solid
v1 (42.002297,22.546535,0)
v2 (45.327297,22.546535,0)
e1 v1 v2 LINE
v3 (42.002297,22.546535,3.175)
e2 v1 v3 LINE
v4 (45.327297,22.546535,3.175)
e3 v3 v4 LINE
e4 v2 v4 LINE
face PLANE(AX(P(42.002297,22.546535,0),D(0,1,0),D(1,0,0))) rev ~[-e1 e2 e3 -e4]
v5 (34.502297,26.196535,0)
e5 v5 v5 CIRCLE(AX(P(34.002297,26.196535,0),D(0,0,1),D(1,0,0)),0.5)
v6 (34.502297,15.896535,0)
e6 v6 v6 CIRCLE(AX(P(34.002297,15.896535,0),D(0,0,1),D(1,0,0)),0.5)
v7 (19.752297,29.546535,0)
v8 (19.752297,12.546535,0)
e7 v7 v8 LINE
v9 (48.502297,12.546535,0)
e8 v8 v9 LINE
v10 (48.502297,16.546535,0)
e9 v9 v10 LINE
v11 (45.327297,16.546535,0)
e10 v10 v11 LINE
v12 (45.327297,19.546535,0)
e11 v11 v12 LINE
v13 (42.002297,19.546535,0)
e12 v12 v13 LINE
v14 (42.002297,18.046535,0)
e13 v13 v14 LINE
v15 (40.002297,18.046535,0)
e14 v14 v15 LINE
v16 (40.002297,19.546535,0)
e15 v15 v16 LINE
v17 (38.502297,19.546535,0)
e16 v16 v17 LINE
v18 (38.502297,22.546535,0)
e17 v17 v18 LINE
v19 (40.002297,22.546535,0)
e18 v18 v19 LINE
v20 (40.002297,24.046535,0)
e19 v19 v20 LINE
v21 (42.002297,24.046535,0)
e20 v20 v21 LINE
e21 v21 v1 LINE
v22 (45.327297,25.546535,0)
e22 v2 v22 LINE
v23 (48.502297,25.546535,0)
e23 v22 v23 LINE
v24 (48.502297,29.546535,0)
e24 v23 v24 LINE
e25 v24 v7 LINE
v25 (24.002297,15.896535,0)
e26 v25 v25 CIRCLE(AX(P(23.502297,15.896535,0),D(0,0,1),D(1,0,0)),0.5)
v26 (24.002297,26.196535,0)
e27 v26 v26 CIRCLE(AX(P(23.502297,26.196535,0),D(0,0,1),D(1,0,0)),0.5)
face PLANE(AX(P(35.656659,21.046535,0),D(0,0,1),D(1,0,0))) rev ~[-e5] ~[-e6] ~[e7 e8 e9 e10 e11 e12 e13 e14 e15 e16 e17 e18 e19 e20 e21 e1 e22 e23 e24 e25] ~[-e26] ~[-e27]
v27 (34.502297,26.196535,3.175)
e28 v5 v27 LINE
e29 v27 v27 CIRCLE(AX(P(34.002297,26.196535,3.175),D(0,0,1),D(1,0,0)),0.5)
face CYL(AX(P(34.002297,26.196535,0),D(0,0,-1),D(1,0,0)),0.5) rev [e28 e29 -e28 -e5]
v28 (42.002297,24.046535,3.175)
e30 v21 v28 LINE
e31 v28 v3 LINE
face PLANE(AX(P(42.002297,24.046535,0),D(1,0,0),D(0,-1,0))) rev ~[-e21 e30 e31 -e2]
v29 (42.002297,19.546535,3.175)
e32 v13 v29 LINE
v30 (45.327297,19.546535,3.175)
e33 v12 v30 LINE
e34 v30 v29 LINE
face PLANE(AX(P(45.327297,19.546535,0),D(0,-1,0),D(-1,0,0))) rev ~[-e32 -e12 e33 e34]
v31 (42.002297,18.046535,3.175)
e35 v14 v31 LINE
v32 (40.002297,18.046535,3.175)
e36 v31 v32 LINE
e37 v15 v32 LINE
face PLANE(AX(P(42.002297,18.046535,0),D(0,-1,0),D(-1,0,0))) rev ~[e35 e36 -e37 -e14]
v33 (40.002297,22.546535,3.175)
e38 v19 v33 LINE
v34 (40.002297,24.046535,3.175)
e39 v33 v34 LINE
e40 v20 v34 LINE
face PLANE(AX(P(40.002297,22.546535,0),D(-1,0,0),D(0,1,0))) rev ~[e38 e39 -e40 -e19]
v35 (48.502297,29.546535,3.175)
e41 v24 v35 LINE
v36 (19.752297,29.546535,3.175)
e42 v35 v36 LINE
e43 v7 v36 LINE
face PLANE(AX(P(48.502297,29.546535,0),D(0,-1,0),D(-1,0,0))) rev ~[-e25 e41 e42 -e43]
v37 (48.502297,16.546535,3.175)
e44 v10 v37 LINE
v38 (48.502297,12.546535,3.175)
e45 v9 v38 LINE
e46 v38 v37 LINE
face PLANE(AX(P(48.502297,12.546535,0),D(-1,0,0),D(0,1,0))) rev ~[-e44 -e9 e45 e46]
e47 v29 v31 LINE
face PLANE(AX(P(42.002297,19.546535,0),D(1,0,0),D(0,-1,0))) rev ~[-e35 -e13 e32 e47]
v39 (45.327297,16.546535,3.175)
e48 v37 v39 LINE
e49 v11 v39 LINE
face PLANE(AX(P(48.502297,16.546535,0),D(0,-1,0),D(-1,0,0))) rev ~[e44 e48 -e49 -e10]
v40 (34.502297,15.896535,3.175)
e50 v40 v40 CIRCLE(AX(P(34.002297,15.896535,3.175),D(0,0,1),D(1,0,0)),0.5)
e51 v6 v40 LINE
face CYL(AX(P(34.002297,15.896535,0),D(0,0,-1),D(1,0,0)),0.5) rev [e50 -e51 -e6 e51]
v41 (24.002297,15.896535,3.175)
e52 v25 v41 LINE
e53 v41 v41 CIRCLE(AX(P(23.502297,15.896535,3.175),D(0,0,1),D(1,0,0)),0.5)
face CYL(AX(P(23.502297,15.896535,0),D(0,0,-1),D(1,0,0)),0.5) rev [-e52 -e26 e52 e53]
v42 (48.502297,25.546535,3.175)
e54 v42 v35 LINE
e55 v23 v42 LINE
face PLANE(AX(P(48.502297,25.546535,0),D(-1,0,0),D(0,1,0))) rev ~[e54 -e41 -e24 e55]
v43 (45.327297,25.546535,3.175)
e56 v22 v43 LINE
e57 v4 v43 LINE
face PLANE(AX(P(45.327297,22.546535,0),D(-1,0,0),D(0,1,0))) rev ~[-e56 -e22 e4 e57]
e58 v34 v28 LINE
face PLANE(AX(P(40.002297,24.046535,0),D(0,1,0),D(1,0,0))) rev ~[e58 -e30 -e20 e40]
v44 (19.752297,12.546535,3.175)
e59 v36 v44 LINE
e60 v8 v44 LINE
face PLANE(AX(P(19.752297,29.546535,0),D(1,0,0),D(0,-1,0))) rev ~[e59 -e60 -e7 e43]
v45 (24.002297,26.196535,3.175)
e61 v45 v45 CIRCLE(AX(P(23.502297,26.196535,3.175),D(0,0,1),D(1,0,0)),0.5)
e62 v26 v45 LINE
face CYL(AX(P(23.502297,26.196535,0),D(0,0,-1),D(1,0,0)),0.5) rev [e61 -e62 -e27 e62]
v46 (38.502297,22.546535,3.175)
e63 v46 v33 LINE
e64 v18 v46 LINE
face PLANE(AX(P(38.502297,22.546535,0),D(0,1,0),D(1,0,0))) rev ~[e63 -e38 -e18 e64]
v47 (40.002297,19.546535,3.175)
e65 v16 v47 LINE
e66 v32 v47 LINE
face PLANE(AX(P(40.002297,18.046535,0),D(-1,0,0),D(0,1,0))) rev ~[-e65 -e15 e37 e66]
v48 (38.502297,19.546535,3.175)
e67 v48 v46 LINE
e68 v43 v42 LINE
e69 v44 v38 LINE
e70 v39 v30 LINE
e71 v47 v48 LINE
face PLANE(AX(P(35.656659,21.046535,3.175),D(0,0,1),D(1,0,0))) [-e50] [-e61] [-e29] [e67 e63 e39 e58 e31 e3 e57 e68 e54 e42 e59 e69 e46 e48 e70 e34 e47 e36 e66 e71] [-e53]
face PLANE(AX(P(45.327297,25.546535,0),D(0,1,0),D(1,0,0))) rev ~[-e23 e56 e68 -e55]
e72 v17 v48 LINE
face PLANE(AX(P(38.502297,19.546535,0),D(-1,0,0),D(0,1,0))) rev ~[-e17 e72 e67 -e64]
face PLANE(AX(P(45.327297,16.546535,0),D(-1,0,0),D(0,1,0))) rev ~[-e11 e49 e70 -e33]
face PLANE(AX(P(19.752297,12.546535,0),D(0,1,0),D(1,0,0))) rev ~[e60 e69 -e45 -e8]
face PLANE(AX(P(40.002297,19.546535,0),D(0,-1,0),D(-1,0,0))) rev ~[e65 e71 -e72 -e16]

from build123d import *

# Parameters (mm, degrees)
F0_R     = 0.5
F1_DEPTH = 3.175


# Not quite as in the source:
# - a length typed as a fraction of an inch, garbled in the dataset ("3 / 203.2 mm" for 3/8 in), is restored


with BuildPart() as f1:
    # F0 (on Top) → F1 (new body)
    with BuildSketch(Plane.XY):
        Polygon((38.5022973402, 19.5465350598), (38.5022973402, 22.5465350598), (40.0022973402, 22.5465350598), (40.0022973402, 24.0465350598), (42.0022973402, 24.0465350598), (42.0022973402, 22.5465350598), (45.3272973402, 22.5465350598), (45.3272973402, 25.5465350598), (48.5022973402, 25.5465350598), (48.5022973402, 29.5465350598), (45.3272973402, 29.5465350598), (19.7522973402, 29.5465350598), (19.7522973402, 12.5465350598), (45.3272973402, 12.5465350598), (48.5022973402, 12.5465350598), (48.5022973402, 16.5465350598), (45.3272973402, 16.5465350598), (45.3272973402, 19.5465350598), (42.0022973402, 19.5465350598), (42.0022973402, 18.0465350598), (40.0022973402, 18.0465350598), (40.0022973402, 19.5465350598), align=None)
        with Locations((23.5022973402, 15.8965350598)):
            Circle(F0_R, mode=Mode.SUBTRACT)
        with Locations((34.0022973402, 15.8965350598)):
            Circle(F0_R, mode=Mode.SUBTRACT)
        with Locations((23.5022973402, 26.1965350598)):
            Circle(F0_R, mode=Mode.SUBTRACT)
        with Locations((34.0022973402, 26.1965350598)):
            Circle(F0_R, mode=Mode.SUBTRACT)
    extrude(amount=F1_DEPTH)


solid = f1.part
